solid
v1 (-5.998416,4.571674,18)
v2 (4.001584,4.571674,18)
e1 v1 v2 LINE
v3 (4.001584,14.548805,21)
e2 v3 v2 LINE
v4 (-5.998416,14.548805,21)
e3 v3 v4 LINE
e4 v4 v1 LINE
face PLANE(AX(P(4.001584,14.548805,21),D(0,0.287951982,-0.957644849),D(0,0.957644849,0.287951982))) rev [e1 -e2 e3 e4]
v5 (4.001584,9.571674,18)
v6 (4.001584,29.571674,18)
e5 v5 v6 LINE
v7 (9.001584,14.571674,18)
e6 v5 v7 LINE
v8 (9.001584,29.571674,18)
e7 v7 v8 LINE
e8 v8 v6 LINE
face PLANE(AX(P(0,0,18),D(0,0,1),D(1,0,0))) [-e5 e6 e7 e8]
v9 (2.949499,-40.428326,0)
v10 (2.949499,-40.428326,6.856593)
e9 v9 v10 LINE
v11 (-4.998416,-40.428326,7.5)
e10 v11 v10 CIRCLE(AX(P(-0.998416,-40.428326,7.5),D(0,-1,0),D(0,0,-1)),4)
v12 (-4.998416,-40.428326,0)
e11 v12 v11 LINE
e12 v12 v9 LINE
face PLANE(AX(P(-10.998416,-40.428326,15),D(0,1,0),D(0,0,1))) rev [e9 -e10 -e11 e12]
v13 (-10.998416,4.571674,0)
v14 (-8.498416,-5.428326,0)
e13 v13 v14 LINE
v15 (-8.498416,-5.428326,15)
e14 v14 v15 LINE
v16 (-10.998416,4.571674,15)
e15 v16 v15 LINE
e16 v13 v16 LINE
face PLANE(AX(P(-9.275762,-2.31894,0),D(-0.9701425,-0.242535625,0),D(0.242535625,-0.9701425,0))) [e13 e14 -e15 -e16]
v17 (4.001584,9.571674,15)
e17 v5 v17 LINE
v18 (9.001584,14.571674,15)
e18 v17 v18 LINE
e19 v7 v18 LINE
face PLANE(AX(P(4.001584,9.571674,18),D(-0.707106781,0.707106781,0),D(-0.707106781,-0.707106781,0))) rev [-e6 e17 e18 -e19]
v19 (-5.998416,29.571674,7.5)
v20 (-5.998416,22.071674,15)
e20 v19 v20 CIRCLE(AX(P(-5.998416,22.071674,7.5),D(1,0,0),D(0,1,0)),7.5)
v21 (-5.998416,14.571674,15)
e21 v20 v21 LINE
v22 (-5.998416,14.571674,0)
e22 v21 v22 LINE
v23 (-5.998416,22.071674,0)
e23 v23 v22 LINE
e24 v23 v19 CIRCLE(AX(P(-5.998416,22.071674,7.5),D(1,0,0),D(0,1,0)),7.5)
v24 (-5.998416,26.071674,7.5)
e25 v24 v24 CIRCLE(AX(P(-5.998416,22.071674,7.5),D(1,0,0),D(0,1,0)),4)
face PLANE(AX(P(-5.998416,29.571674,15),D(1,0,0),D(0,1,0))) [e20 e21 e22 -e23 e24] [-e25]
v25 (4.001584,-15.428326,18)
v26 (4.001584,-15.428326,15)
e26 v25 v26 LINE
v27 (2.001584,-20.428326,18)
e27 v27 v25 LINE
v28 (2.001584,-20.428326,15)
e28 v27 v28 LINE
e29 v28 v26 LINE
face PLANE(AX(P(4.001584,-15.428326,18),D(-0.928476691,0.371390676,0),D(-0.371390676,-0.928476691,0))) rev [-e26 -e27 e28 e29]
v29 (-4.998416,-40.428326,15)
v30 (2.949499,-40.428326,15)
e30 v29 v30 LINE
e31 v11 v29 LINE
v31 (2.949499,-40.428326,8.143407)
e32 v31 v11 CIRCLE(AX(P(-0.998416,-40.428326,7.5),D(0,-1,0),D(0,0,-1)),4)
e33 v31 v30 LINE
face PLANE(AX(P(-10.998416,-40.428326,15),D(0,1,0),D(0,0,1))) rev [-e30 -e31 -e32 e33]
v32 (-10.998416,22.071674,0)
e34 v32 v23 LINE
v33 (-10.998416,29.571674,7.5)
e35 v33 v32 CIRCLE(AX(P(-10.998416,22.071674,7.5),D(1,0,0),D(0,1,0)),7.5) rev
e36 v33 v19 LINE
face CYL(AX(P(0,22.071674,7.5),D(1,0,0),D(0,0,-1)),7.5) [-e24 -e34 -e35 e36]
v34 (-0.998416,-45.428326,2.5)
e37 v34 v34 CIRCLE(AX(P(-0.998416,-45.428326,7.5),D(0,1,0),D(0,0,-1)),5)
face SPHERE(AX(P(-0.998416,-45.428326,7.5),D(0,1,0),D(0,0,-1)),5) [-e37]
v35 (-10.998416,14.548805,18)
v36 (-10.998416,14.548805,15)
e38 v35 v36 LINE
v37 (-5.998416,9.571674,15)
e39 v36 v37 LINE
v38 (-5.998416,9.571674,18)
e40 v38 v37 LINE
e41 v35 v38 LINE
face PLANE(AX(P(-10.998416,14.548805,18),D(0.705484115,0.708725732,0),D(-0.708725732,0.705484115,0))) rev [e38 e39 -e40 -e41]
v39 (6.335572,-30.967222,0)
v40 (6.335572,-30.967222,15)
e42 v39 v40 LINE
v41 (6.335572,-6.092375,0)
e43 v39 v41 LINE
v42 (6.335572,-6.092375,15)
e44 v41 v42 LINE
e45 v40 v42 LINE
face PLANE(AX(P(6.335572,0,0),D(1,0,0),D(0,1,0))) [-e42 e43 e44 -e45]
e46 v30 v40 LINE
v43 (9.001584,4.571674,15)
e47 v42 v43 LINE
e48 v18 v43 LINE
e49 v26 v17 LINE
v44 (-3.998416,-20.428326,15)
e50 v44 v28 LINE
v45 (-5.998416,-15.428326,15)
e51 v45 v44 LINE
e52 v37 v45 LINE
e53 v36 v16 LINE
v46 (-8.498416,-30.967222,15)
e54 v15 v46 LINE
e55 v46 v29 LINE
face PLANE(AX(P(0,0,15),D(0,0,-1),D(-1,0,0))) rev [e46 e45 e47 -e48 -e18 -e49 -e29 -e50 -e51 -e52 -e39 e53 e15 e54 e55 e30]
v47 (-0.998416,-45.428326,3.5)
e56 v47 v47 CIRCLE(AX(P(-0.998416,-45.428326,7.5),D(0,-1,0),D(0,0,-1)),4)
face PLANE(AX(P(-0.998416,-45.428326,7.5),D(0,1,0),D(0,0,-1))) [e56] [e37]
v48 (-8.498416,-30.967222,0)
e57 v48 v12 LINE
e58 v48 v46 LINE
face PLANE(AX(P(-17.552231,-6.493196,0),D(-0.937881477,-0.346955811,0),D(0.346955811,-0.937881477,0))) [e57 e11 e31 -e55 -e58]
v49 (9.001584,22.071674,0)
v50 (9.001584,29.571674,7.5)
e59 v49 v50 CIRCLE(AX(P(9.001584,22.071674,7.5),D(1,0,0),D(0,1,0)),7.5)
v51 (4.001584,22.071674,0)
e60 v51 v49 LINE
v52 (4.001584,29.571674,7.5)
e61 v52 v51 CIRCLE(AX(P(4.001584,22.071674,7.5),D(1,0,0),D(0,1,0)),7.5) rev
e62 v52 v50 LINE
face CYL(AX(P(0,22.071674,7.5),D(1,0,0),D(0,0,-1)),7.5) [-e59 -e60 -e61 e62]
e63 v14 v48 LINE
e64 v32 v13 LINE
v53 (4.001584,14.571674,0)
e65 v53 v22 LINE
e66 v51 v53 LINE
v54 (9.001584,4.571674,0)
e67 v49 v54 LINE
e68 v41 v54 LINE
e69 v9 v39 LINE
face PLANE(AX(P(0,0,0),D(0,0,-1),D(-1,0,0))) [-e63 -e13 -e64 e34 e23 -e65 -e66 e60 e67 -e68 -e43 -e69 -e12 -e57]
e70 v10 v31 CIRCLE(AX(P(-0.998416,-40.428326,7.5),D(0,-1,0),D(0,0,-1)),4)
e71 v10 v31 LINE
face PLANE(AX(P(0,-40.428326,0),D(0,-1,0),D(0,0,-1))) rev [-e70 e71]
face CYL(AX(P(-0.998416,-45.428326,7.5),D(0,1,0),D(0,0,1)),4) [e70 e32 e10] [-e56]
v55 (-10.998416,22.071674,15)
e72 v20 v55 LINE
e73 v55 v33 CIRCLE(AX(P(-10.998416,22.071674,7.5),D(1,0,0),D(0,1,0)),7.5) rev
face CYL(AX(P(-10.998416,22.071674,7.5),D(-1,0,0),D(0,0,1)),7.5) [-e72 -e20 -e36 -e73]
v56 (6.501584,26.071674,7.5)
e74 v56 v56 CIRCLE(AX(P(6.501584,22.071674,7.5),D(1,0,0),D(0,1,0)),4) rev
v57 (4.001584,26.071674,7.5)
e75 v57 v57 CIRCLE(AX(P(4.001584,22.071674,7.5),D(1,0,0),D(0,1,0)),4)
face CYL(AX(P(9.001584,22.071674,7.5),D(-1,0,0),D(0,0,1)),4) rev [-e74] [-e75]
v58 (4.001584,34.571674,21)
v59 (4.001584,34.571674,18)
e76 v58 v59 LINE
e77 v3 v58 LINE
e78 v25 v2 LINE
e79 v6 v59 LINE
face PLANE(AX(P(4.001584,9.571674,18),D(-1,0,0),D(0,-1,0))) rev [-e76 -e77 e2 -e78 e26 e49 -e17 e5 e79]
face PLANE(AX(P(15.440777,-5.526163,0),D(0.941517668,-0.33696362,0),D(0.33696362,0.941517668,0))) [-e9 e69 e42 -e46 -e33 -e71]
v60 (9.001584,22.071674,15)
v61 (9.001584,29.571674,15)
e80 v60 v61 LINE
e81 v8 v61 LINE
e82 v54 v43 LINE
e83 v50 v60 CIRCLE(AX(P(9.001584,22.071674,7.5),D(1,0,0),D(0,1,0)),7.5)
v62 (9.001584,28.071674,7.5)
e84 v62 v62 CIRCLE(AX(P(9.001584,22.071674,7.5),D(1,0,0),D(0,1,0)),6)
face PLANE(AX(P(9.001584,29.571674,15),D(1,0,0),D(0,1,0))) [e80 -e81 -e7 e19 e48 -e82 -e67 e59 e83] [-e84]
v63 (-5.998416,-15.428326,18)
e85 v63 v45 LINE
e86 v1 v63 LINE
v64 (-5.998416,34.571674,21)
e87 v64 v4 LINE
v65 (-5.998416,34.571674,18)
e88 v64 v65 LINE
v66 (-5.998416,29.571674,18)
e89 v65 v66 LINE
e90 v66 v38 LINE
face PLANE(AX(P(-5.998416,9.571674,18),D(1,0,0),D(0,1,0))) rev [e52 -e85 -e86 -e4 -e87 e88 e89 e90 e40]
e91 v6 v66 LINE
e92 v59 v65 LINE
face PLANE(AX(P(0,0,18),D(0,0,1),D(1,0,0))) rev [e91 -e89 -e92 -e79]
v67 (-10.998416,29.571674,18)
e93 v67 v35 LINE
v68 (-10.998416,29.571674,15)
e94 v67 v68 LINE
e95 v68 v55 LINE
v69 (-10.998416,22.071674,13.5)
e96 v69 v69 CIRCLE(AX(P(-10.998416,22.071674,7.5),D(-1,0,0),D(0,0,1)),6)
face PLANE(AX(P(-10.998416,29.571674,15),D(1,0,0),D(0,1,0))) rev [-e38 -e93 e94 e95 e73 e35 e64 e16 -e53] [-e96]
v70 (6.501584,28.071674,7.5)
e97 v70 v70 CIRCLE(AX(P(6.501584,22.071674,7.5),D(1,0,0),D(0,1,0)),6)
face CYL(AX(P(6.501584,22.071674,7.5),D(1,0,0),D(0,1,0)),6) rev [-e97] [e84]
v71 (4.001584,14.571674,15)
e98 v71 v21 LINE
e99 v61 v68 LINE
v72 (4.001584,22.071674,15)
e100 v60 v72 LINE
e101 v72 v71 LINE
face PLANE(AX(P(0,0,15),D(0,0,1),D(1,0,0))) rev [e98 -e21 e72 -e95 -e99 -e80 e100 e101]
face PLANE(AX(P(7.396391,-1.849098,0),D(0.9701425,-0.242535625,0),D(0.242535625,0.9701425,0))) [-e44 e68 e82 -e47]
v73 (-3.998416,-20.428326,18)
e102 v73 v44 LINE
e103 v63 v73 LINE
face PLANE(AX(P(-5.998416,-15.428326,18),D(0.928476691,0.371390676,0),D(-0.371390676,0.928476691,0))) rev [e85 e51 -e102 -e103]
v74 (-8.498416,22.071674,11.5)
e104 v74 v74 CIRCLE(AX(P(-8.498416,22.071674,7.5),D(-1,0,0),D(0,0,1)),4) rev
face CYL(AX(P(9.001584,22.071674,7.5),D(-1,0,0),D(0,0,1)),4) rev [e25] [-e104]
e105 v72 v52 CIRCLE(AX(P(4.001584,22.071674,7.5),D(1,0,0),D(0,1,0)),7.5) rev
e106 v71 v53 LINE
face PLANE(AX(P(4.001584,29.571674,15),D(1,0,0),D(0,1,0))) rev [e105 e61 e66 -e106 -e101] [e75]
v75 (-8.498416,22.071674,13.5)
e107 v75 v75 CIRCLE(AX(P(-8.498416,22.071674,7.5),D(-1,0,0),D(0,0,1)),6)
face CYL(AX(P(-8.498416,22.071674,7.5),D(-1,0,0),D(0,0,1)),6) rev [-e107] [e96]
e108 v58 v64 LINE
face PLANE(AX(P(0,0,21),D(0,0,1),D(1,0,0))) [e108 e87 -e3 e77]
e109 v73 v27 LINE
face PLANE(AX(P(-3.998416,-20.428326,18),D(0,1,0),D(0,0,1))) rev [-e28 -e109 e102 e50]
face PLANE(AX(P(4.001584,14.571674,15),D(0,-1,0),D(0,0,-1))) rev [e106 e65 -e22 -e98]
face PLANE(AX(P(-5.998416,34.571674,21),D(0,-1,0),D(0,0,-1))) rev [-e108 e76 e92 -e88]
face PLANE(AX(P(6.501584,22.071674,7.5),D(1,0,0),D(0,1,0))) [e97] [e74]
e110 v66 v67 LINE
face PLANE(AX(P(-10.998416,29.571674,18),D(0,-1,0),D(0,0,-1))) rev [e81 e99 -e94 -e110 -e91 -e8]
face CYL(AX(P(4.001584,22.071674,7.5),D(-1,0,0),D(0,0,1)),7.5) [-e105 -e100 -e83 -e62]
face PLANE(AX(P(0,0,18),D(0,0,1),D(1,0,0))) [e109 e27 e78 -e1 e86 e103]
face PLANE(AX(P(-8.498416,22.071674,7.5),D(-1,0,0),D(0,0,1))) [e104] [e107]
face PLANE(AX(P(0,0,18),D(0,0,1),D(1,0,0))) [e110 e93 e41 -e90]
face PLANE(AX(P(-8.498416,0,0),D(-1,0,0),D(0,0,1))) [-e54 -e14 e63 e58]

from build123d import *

# Parameters (mm, degrees)
BOSS_EXTRUDE2_DEPTH = 15
SKETCH2_R           = 4
CUT_EXTRUDE1_DEPTH  = 20
SKETCH3_R           = 6
CUT_EXTRUDE2_DEPTH  = 2.5
CUT_EXTRUDE3_START  = -2.5
SKETCH4_R           = 6
CUT_EXTRUDE3_DEPTH  = 2.5
FILLET1_R           = 7.5
BOSS_EXTRUDE3_DEPTH = 3
SKETCH6_W           = 10
SKETCH6_H           = 30
BOSS_EXTRUDE4_DEPTH = 3
CUT_EXTRUDE4_DEPTH  = 10
SKETCH8_R           = 4
BOSS_EXTRUDE6_DEPTH = 5
REVOLVE3_ANGLE      = 180
CUT_EXTRUDE6_DEPTH  = 15


with BuildPart() as part:
    # Sketch1 → Boss-Extrude2 (new body)
    with BuildSketch(Plane.XY):
        Polygon((4.00158439, 29.571674002), (4.00158439, 14.571674002), (-5.99841561, 14.571674002), (-5.99841561, 29.571674002), (-10.99841561, 29.571674002), (-10.99841561, -40.428325998), (9.00158439, -40.428325998), (9.00158439, 29.571674002), align=None)
    extrude(amount=BOSS_EXTRUDE2_DEPTH)

    # Sketch2 → Cut-Extrude1 (cut)
    with BuildSketch(Plane.ZY.offset(10.99841561)):
        with Locations((7.5, 22.071674002)):
            Circle(SKETCH2_R)
    extrude(amount=-CUT_EXTRUDE1_DEPTH, mode=Mode.SUBTRACT)

    # Sketch3 → Cut-Extrude2 (cut)
    with BuildSketch(Plane.ZY.offset(10.99841561)):
        with Locations((7.5, 22.071674002)):
            Circle(SKETCH3_R)
    extrude(amount=-CUT_EXTRUDE2_DEPTH, mode=Mode.SUBTRACT)

    # Sketch4 → Cut-Extrude3 (cut)
    with BuildSketch(Plane(origin=(9.00158439, 0, 0), x_dir=(0, 0, -1), z_dir=(1, 0, 0)).offset(CUT_EXTRUDE3_START)):
        with Locations(Location((-7.5, 22.071674002, 0), (0, 0, 180))):
            Circle(SKETCH4_R)
    extrude(amount=CUT_EXTRUDE3_DEPTH, mode=Mode.SUBTRACT)

    # Fillet1
    fillet1_edges = [part.edges().sort_by_distance(p)[0] for p in [
        (6.50158439, 29.571674002, 0),
        (6.50158439, 29.571674002, 15),
        (-8.49841561, 29.571674002, 0),
        (-8.49841561, 29.571674002, 15),
    ]]
    fillet(fillet1_edges, radius=FILLET1_R - 0.0001)  # a hair under: the kernel refuses the full size

    # Sketch5 → Boss-Extrude3 (add)
    with BuildSketch(Plane.XY.offset(15)):
        Polygon((-5.99841561, 9.571674002), (-5.99841561, -15.428325998), (-3.99841561, -20.428325998), (2.00158439, -20.428325998), (4.00158439, -15.428325998), (4.00158439, 9.571674002), (9.00158439, 14.571674002), (9.00158439, 29.571674002), (-10.99841561, 29.571674002), (-10.99841561, 14.548804666), align=None)
    extrude(amount=BOSS_EXTRUDE3_DEPTH)

    # Sketch6 → Boss-Extrude4 (add)
    with BuildSketch(Plane.XY.offset(18)):
        with Locations((-0.99841561, 19.571674002)):
            Rectangle(SKETCH6_W, SKETCH6_H)
    extrude(amount=BOSS_EXTRUDE4_DEPTH)

    # Sketch7 → Cut-Extrude4 (cut)
    with BuildSketch(Plane.ZY.offset(5.99841561)):
        Polygon((21, 14.548804666), (18, 4.571674002), (21, 4.571674002), align=None)
    extrude(amount=-CUT_EXTRUDE4_DEPTH, mode=Mode.SUBTRACT)

    # Sketch8 → Boss-Extrude6 (add)
    with BuildSketch(Plane.XZ.offset(40.428325998)):
        with Locations(Location((-0.99841561, 7.5, 0), (0, 0, 270))):
            Circle(SKETCH8_R)
    extrude(amount=BOSS_EXTRUDE6_DEPTH)

    # Sketch9 → Revolve3 (revolve)
    with BuildSketch(Plane(origin=(0, -45.428325998, 0), x_dir=(-1, 0, 0), z_dir=(0, -1, 0))):
        with BuildLine():
            Line((0.99841561, -12.5), (0.99841561, -2.5))
            ThreePointArc((0.99841561, -2.5), (5.99841561, -7.5), (0.99841561, -12.5))
        make_face()
    revolve(axis=Axis((-0.99841561, -45.428325998, 12.5), (0, 0, 1)), revolution_arc=REVOLVE3_ANGLE)

    # Sketch10 → Cut-Extrude6 (cut)
    with BuildSketch(Plane.XY.offset(15)):
        Polygon((6.335572216, -30.967221552), (2.949498735, -40.428325998), (9.00158439, -40.428325998), (9.00158439, 4.571674002), (6.335572216, -6.092374694), align=None)
        Polygon((-8.49841561, -24.415311945), (-8.49841561, -5.428325998), (-10.99841561, 4.571674002), (-10.99841561, -40.428325998), (-4.99841561, -40.428325998), (-8.49841561, -30.967221552), align=None)
    extrude(amount=-CUT_EXTRUDE6_DEPTH, mode=Mode.SUBTRACT)


solid = part.part
